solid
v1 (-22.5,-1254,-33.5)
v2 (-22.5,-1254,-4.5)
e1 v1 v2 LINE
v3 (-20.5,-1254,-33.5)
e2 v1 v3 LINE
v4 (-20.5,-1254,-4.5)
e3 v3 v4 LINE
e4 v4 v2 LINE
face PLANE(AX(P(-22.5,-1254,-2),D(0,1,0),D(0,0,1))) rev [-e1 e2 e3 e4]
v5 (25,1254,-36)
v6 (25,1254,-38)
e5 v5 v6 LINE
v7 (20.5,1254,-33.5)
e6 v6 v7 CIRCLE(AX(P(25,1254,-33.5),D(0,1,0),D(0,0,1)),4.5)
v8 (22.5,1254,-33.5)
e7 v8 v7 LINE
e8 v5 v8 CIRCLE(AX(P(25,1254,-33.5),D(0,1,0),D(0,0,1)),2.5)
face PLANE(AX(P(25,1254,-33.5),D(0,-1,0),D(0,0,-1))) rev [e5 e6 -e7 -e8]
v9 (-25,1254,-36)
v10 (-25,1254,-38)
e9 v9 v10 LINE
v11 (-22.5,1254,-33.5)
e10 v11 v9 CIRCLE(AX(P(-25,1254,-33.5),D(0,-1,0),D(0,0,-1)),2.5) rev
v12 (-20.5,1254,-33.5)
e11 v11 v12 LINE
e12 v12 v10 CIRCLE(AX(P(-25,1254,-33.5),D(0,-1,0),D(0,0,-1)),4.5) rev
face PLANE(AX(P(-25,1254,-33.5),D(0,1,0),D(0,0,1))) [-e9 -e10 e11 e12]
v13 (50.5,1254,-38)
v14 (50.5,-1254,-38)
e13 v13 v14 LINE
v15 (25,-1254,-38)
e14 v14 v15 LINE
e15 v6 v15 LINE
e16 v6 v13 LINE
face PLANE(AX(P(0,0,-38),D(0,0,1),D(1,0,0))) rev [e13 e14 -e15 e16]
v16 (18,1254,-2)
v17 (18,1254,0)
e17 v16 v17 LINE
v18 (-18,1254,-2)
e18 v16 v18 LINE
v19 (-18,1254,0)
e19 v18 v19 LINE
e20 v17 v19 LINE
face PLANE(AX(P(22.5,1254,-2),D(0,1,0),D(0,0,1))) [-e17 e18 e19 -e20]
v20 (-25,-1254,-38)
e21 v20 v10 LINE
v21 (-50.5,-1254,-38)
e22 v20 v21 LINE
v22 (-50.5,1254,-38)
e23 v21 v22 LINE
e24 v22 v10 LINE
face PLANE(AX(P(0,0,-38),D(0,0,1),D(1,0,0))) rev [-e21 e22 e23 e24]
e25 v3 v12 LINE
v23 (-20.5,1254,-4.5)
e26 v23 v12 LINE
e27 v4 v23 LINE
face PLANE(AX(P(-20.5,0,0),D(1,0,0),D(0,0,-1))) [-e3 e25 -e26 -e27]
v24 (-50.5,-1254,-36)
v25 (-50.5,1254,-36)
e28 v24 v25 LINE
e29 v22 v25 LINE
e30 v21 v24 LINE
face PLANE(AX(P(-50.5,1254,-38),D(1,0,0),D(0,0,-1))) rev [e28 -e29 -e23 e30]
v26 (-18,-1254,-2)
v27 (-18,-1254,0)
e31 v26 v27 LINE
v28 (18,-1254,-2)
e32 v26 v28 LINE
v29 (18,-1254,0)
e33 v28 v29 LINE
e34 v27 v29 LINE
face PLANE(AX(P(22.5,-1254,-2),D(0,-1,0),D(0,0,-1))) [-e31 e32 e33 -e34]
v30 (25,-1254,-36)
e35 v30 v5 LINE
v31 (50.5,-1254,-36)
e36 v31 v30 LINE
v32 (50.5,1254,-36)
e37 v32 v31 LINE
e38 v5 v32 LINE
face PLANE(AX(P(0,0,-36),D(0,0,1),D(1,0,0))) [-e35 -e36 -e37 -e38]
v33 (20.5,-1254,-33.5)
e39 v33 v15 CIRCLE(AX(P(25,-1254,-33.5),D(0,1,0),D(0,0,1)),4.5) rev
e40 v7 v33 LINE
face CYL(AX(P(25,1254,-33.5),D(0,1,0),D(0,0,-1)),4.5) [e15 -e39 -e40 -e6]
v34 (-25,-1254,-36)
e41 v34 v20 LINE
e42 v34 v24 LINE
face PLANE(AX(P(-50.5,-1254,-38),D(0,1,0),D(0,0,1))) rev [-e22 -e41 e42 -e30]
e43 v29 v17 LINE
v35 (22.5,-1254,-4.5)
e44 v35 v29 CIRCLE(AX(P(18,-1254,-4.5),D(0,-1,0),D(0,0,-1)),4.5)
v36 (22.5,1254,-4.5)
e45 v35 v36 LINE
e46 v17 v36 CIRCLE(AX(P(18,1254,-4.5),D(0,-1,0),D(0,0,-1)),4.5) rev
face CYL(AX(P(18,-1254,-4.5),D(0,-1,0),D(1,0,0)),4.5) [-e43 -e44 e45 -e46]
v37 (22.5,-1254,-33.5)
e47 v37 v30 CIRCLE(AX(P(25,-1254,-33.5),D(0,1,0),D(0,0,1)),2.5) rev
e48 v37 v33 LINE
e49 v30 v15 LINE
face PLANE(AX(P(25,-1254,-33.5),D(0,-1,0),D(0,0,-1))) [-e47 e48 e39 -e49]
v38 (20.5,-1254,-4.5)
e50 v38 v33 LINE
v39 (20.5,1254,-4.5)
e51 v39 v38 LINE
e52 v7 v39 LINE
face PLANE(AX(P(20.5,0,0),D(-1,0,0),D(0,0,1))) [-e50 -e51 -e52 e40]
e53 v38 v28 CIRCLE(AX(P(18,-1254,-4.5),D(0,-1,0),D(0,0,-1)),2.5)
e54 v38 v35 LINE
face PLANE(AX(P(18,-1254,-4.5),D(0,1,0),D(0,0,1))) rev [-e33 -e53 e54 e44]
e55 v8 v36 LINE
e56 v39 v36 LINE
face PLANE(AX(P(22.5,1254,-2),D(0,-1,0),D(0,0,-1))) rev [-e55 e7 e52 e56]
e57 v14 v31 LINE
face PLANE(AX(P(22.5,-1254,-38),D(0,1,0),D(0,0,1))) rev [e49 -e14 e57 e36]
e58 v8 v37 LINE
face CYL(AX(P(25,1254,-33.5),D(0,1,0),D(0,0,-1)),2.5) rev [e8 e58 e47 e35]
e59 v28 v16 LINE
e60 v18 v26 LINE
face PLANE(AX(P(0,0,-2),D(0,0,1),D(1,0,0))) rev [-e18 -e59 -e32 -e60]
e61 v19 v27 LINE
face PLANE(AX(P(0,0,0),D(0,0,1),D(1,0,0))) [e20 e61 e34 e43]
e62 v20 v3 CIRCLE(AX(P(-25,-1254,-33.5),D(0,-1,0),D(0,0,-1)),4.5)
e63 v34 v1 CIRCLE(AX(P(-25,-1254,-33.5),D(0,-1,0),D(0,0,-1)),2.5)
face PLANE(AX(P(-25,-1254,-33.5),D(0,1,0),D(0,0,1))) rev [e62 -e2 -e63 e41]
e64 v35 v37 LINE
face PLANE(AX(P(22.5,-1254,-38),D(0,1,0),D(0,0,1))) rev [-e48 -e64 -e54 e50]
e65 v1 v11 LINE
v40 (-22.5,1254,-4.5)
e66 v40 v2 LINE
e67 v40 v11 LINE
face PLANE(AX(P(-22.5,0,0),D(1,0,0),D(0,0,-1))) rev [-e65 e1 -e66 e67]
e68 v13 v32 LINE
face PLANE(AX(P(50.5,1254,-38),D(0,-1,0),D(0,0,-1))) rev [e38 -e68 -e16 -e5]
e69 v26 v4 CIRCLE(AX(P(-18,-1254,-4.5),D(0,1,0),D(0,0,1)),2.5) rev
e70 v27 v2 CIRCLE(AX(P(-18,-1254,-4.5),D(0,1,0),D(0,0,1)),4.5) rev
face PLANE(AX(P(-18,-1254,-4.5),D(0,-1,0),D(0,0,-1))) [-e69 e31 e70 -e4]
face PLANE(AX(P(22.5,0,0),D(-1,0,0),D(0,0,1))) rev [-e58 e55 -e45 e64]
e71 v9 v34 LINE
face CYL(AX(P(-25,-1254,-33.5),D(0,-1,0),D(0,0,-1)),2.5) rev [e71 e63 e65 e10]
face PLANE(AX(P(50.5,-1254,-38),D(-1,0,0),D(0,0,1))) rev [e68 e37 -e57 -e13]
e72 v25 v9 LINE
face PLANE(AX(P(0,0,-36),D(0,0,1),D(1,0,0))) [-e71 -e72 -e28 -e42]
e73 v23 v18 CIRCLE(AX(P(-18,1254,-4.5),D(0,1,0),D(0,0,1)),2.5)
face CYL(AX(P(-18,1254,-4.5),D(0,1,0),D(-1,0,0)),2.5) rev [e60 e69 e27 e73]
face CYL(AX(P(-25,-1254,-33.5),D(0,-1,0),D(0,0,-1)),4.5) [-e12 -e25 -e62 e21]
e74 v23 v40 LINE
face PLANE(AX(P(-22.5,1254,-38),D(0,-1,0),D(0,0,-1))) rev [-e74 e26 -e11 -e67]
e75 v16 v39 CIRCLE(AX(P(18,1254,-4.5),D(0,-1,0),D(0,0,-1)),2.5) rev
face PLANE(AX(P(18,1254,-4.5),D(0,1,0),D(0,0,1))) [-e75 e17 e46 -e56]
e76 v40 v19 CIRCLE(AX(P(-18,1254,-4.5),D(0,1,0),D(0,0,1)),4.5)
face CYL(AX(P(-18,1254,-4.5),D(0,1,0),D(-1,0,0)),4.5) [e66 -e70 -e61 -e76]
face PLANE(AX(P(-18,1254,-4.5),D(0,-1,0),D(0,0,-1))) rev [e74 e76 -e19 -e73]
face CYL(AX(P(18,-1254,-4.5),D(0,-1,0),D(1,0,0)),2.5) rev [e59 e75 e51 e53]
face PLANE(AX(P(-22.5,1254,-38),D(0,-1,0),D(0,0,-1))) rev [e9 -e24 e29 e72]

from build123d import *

# Parameters (mm, degrees)
SKETCH1_W                      = 45
SKETCH1_H                      = 2508
BASE_FLANGE1_DEPTH             = 2
EDGE_FLANGE1_STRIP_W           = 13
EDGE_FLANGE1_STRIP_H           = 2
EDGE_FLANGE1_STRIP_CUT_DEPTH   = 2508
EDGE_FLANGE1_STRIP_2_W         = 13
EDGE_FLANGE1_STRIP_2_H         = 2
EDGE_FLANGE1_STRIP_CUT_2_DEPTH = 2508
EDGE_FLANGE1_DEPTH             = 2508
EDGE_FLANGE1_BEND_DEPTH        = 2508
EDGE_FLANGE2_STRIP_W           = 13
EDGE_FLANGE2_STRIP_H           = 2
EDGE_FLANGE2_STRIP_CUT_DEPTH   = 2508
EDGE_FLANGE2_STRIP_2_W         = 13
EDGE_FLANGE2_STRIP_2_H         = 2
EDGE_FLANGE2_STRIP_CUT_2_DEPTH = 2508
EDGE_FLANGE2_DEPTH             = 2508
EDGE_FLANGE2_BEND_DEPTH        = 2508


# Sheet-metal steps are written as plain solids
with BuildPart() as part:
    # Sketch1 → Base-Flange1 (new body)
    with BuildSketch(Plane.XY):
        Rectangle(SKETCH1_W, SKETCH1_H)
    extrude(amount=-BASE_FLANGE1_DEPTH)

    # Edge-Flange1 strip (across the edge) → Edge-Flange1 strip cut (cut)
    with BuildSketch(Plane(origin=(22.5, 1254, -2), x_dir=(-1, 0, 0), z_dir=(0, -1, 0))):
        with Locations((-2, -1)):
            Rectangle(EDGE_FLANGE1_STRIP_W, EDGE_FLANGE1_STRIP_H)
    extrude(amount=EDGE_FLANGE1_STRIP_CUT_DEPTH, mode=Mode.SUBTRACT)

    # Edge-Flange1 strip 2 (across the edge) → Edge-Flange1 strip cut 2 (cut)
    with BuildSketch(Plane(origin=(-22.5, -1254, -2), x_dir=(1, 0, 0), z_dir=(0, 1, 0))):
        with Locations((-2, -1)):
            Rectangle(EDGE_FLANGE1_STRIP_2_W, EDGE_FLANGE1_STRIP_2_H)
    extrude(amount=EDGE_FLANGE1_STRIP_CUT_2_DEPTH, mode=Mode.SUBTRACT)

    # Edge-Flange1 section (across the edge) → Edge-Flange1 (add)
    with BuildSketch(Plane(origin=(22.5, 1254, -2), x_dir=(-1, 0, 0), z_dir=(0, -1, 0))):
        with BuildLine():
            Line((0, 2.5), (0, 36))
            Line((0, 36), (2, 36))
            Line((2, 36), (2, 2.5))
            ThreePointArc((2, 2.5), (2.732233047, 0.732233047), (4.5, 0))
            Line((4.5, 0), (4.5, -2))
            ThreePointArc((4.5, -2), (1.318019485, -0.681980515), (0, 2.5))
        make_face()
    extrude(amount=EDGE_FLANGE1_DEPTH)

    # Edge-Flange1 section 2 (across the edge) → Edge-Flange1 bend (add)
    with BuildSketch(Plane(origin=(-22.5, -1254, -2), x_dir=(1, 0, 0), z_dir=(0, 1, 0))):
        with BuildLine():
            Line((0, 2.5), (0, 36))
            Line((0, 36), (2, 36))
            Line((2, 36), (2, 2.5))
            ThreePointArc((2, 2.5), (2.732233047, 0.732233047), (4.5, 0))
            Line((4.5, 0), (4.5, -2))
            ThreePointArc((4.5, -2), (1.318019485, -0.681980515), (0, 2.5))
        make_face()
    extrude(amount=EDGE_FLANGE1_BEND_DEPTH)

    # Edge-Flange2 strip (across the edge) → Edge-Flange2 strip cut (cut)
    with BuildSketch(Plane(origin=(-22.5, 1254, -38), x_dir=(0, 0, 1), z_dir=(0, -1, 0))):
        with Locations((-2, -1)):
            Rectangle(EDGE_FLANGE2_STRIP_W, EDGE_FLANGE2_STRIP_H)
    extrude(amount=EDGE_FLANGE2_STRIP_CUT_DEPTH, mode=Mode.SUBTRACT)

    # Edge-Flange2 strip 2 (across the edge) → Edge-Flange2 strip cut 2 (cut)
    with BuildSketch(Plane(origin=(22.5, -1254, -38), x_dir=(0, 0, 1), z_dir=(0, 1, 0))):
        with Locations((-2, -1)):
            Rectangle(EDGE_FLANGE2_STRIP_2_W, EDGE_FLANGE2_STRIP_2_H)
    extrude(amount=EDGE_FLANGE2_STRIP_CUT_2_DEPTH, mode=Mode.SUBTRACT)

    # Edge-Flange2 section (across the edge) → Edge-Flange2 (add)
    with BuildSketch(Plane(origin=(-22.5, 1254, -38), x_dir=(0, 0, 1), z_dir=(0, -1, 0))):
        with BuildLine():
            Line((0, 2.5), (0, 28))
            Line((0, 28), (2, 28))
            Line((2, 28), (2, 2.5))
            ThreePointArc((2, 2.5), (2.732233047, 0.732233047), (4.5, 0))
            Line((4.5, 0), (4.5, -2))
            ThreePointArc((4.5, -2), (1.318019485, -0.681980515), (0, 2.5))
        make_face()
    extrude(amount=EDGE_FLANGE2_DEPTH)

    # Edge-Flange2 section 2 (across the edge) → Edge-Flange2 bend (add)
    with BuildSketch(Plane(origin=(22.5, -1254, -38), x_dir=(0, 0, 1), z_dir=(0, 1, 0))):
        with BuildLine():
            Line((0, 2.5), (0, 28))
            Line((0, 28), (2, 28))
            Line((2, 28), (2, 2.5))
            ThreePointArc((2, 2.5), (2.732233047, 0.732233047), (4.5, 0))
            Line((4.5, 0), (4.5, -2))
            ThreePointArc((4.5, -2), (1.318019485, -0.681980515), (0, 2.5))
        make_face()
    extrude(amount=EDGE_FLANGE2_BEND_DEPTH)


solid = part.part
